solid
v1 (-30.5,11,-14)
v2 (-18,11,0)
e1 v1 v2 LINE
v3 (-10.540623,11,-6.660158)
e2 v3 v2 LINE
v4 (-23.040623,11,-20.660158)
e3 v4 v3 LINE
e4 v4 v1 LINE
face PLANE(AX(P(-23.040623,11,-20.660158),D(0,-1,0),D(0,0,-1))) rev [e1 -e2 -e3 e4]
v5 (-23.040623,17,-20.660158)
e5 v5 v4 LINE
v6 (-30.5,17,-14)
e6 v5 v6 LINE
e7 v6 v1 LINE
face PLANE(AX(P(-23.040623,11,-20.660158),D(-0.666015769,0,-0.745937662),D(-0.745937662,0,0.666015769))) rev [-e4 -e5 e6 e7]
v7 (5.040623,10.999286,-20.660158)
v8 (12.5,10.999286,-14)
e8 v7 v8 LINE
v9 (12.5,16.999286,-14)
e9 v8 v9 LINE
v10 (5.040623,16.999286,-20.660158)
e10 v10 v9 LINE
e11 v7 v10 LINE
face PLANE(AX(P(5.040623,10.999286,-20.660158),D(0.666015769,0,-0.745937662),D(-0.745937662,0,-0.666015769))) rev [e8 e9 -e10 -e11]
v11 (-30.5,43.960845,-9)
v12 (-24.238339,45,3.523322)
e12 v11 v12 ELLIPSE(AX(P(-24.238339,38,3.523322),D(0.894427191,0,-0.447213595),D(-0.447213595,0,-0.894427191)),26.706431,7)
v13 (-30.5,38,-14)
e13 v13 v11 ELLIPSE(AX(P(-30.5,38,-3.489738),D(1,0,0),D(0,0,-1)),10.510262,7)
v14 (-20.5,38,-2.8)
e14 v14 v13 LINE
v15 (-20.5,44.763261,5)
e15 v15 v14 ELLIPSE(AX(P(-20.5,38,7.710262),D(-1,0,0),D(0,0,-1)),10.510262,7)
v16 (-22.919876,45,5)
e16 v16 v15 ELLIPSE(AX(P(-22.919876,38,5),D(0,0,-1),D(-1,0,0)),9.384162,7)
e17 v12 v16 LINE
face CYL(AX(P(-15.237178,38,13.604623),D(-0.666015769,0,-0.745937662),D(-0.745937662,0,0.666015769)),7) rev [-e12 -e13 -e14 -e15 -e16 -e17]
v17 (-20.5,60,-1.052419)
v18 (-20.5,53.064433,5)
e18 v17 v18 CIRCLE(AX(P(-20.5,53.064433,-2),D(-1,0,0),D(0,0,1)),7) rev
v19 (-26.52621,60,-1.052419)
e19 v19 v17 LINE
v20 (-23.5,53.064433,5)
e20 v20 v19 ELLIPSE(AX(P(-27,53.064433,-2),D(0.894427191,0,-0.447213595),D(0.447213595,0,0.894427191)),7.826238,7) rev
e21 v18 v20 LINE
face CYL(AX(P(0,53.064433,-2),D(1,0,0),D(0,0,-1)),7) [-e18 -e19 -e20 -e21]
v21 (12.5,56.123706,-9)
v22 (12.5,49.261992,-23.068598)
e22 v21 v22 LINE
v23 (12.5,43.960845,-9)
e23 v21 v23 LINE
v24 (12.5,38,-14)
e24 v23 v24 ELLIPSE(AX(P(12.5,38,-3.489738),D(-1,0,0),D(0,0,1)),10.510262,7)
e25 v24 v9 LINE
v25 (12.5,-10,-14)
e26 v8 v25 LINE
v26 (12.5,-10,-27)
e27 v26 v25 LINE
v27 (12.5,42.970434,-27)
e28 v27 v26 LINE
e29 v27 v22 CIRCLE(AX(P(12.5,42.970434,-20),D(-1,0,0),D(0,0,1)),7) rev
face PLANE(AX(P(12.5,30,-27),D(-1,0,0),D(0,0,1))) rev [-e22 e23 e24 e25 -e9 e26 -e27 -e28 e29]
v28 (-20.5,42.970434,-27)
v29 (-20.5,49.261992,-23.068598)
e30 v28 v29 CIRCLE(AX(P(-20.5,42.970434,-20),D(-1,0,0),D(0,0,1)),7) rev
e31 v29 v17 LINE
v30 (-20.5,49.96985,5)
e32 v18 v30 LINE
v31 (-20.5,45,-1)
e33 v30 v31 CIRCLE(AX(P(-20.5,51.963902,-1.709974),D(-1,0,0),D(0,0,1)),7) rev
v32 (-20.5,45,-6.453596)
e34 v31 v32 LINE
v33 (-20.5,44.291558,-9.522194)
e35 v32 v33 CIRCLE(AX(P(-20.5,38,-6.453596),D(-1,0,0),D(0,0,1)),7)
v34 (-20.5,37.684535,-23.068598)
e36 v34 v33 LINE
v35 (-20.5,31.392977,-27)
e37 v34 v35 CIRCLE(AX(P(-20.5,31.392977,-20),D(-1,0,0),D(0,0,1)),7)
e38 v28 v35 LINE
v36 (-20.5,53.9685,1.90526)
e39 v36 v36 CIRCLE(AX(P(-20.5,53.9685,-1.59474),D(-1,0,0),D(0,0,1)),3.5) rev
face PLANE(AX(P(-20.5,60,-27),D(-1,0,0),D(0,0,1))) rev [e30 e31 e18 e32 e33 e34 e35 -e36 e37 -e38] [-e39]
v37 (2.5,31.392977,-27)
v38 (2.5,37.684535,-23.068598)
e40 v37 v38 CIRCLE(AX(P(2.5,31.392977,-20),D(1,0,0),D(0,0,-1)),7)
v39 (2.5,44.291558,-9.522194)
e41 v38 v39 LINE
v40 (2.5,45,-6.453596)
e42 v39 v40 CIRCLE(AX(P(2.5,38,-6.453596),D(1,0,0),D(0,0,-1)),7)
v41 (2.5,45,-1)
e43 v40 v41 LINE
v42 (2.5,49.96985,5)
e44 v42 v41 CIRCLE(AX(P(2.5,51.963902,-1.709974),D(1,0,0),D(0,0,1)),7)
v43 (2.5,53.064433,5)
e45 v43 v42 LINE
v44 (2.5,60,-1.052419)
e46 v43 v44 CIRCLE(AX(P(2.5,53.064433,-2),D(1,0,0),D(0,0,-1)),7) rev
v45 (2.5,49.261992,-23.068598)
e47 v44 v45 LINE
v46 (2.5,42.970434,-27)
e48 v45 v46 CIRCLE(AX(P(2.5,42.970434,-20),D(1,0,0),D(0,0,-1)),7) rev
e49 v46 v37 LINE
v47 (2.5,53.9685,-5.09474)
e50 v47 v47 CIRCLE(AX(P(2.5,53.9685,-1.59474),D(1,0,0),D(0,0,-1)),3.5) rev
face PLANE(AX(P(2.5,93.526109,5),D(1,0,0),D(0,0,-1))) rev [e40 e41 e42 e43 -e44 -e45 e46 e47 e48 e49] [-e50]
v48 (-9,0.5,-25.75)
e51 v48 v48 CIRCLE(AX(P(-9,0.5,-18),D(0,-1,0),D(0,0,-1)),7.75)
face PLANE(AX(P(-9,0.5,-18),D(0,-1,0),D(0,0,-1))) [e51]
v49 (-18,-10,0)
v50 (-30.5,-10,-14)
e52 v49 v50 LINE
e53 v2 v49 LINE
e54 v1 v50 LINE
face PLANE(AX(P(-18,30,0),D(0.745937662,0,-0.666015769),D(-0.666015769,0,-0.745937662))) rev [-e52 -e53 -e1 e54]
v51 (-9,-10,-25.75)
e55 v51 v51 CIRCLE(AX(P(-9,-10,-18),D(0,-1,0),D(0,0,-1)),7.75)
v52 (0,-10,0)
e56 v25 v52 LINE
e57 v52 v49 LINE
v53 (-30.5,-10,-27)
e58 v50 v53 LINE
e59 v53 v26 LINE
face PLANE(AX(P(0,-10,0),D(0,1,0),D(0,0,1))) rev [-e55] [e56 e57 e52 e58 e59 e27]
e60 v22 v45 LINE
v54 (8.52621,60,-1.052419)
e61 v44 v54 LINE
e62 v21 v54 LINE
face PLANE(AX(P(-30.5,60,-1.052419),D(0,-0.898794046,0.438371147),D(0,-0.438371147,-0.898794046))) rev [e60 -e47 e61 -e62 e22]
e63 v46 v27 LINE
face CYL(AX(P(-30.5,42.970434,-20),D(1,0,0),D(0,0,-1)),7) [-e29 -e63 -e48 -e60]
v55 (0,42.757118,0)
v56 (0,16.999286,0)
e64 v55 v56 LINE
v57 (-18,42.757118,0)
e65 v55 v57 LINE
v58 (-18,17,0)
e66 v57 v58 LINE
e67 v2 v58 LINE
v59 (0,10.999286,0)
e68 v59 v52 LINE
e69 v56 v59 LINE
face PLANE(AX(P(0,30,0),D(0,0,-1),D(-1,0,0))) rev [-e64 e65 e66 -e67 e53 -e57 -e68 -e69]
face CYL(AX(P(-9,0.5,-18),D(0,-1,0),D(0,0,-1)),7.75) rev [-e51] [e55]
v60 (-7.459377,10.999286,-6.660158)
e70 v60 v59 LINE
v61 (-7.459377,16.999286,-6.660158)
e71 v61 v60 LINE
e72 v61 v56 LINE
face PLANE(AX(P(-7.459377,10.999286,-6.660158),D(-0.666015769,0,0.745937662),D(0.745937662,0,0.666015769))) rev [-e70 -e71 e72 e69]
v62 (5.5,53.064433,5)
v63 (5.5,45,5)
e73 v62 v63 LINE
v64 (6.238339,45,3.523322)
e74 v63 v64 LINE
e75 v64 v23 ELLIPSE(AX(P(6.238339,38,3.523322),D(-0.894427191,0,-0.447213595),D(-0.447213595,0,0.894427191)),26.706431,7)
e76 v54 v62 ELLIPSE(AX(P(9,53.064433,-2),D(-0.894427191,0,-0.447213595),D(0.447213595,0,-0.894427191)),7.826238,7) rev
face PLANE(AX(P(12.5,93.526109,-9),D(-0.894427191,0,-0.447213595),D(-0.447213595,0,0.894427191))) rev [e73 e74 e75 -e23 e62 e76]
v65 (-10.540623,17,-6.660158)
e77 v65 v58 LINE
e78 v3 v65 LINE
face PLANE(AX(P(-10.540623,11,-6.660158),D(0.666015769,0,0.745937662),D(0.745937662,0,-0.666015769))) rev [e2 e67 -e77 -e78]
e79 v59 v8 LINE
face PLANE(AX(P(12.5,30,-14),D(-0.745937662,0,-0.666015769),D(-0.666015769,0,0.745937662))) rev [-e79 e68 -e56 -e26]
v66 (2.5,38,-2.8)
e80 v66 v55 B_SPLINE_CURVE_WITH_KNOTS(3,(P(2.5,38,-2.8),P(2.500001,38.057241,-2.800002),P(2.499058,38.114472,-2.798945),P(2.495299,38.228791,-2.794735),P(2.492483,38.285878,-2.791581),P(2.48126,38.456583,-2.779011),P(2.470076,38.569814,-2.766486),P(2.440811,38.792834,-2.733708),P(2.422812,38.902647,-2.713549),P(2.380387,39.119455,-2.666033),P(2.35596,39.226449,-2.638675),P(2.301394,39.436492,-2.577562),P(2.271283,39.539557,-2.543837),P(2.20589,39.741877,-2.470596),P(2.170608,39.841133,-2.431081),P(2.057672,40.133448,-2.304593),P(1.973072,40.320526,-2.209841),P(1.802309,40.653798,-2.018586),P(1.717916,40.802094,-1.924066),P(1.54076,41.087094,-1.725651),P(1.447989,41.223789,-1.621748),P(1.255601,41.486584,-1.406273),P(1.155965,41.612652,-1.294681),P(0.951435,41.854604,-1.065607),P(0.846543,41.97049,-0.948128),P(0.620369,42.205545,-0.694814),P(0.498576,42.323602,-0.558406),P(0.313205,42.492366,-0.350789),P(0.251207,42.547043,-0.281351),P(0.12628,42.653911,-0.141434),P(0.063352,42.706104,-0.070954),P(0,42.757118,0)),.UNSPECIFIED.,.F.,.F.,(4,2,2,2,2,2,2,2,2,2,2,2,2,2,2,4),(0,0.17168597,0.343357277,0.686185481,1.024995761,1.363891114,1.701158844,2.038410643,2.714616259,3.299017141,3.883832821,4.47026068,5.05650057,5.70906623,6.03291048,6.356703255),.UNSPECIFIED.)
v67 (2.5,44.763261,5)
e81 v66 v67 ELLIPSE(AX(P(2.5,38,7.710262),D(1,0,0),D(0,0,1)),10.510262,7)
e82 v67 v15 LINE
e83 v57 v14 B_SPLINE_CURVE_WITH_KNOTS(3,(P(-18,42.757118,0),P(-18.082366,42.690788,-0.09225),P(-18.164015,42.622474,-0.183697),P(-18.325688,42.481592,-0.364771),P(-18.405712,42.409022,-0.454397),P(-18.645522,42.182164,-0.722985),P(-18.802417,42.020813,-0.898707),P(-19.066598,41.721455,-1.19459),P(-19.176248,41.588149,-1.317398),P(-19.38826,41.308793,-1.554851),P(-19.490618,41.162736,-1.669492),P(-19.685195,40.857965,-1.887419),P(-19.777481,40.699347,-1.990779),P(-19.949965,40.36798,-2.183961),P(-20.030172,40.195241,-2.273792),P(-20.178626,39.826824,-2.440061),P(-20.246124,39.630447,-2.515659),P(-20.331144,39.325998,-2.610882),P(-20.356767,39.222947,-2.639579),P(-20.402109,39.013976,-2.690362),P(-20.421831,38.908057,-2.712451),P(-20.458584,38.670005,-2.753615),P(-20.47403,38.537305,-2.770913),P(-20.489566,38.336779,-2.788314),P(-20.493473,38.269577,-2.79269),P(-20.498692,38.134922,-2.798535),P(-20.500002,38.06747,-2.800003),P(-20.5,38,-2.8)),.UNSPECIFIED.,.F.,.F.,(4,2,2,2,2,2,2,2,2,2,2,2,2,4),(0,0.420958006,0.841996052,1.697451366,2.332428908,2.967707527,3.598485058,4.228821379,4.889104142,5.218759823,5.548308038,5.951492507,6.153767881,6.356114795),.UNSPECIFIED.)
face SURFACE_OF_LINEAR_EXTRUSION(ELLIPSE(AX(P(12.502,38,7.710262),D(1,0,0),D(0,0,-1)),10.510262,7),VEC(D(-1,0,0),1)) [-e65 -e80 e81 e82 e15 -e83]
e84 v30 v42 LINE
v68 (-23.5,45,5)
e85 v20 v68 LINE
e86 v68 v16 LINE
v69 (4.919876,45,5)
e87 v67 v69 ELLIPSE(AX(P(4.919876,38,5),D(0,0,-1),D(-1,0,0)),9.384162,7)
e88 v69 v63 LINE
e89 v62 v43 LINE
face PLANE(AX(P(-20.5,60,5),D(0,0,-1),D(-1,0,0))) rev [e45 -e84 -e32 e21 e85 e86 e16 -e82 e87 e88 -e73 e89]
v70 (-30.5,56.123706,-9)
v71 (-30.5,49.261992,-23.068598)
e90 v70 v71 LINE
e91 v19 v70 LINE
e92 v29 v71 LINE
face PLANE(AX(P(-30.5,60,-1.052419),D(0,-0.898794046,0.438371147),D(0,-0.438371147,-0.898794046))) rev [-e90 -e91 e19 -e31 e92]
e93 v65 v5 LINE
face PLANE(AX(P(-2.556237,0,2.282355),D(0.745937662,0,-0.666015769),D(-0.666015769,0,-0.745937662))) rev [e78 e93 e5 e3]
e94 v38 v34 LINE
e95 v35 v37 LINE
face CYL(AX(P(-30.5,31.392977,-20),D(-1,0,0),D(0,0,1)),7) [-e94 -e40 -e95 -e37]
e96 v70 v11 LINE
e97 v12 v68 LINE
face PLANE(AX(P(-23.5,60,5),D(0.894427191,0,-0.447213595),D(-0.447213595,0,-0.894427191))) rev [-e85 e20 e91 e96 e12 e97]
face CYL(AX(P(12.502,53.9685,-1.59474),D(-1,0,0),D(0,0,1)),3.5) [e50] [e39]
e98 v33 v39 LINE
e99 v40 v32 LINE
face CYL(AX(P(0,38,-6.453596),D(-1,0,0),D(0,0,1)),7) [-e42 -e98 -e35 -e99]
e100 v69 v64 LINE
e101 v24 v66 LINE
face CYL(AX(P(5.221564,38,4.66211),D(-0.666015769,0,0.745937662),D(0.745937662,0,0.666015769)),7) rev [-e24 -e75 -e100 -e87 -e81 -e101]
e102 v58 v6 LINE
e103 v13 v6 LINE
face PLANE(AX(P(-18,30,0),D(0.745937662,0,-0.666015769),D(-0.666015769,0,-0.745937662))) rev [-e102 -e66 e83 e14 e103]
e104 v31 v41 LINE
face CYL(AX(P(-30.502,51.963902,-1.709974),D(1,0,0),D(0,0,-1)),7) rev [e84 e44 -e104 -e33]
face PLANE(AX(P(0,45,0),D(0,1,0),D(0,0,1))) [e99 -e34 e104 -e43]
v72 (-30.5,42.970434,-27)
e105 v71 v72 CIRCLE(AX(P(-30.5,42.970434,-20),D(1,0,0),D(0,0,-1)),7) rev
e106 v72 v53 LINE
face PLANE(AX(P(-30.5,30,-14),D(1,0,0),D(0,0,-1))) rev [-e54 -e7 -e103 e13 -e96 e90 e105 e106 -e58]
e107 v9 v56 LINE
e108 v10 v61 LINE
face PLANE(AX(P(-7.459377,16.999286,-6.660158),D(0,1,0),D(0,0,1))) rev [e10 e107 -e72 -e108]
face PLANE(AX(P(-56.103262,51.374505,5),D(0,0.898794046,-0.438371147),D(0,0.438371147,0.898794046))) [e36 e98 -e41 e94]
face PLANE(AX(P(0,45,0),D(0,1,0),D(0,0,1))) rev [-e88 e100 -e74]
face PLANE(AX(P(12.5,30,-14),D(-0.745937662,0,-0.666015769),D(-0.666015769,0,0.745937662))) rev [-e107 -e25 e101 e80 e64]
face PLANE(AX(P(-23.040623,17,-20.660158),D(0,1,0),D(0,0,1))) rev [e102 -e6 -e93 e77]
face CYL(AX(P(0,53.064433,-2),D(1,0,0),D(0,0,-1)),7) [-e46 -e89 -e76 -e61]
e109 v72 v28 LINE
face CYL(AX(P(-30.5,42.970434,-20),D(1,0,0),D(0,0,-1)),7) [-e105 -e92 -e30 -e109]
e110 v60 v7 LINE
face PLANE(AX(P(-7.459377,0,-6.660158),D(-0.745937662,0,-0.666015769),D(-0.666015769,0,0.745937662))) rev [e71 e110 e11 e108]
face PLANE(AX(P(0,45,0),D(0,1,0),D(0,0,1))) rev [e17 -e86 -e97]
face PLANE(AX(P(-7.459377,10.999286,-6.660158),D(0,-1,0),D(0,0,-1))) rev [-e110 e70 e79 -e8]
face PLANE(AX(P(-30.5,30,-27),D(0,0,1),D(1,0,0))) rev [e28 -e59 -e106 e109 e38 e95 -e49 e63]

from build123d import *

# Parameters (mm, degrees)
BOSS_EXTRUDE1_DEPTH     = 30
SKETCH6_R               = 7.75
CUT_EXTRUDE3_DEPTH      = 0.5
BOSS_EXTRUDE2_DEPTH     = 15
BOSS_EXTRUDE3_DEPTH     = 15
CHAMFER1_SIZE           = 5
CHAMFER1_SIZE2          = 10.251519208
BOSS_EXTRUDE5_DEPTH     = 15
BOSS_EXTRUDE6_REACH     = 75.607
SKETCH10_R              = 3.5
BOSS_EXTRUDE7_REACH     = 62.698
SKETCH18_W              = 10
SKETCH18_H              = 10.251519208
CUT_EXTRUDE4_DEPTH      = 74.607064878
CUT_EXTRUDE4_DEPTH_BACK = 74.607064878
FILLET4_R               = 7
FILLET5_R               = 7
FILLET6_R               = 7
FILLET7_R               = 7
BOSS_EXTRUDE8_REACH     = 75.607
FILLET9_R               = 7
CUT_EXTRUDE5_DEPTH      = 23
FILLET12_R              = 7
BOSS_EXTRUDE9_REACH     = 75.607
BOSS_EXTRUDE10_START    = 10
SKETCH24_R              = 7.75
BOSS_EXTRUDE10_DEPTH    = 10
SKETCH25_W              = 18.768324379
SKETCH25_H              = 6
CUT_EXTRUDE6_DEPTH      = 10
SKETCH26_W              = 18.768324379
SKETCH26_H              = 6
CUT_EXTRUDE7_DEPTH      = 10


with BuildPart() as part:
    # Sketch1 → Boss-Extrude1 (new body)
    with BuildSketch(Plane(origin=(0, 0, 0), x_dir=(1, 0, 0), z_dir=(0, 1, 0))):
        Polygon((-30.5, 27), (12.5, 27), (12.5, 14), (0, 0), (-18, 0), (-30.5, 14), align=None)
    extrude(amount=BOSS_EXTRUDE1_DEPTH)

    # Sketch6 → Cut-Extrude3 (cut)
    with BuildSketch(Plane.XZ):
        with Locations(Location((-9, -18, 0), (0, 0, 270))):
            Circle(SKETCH6_R)
    extrude(amount=-CUT_EXTRUDE3_DEPTH, mode=Mode.SUBTRACT)

    # Sketch7 → Boss-Extrude2 (add)
    with BuildSketch(Plane(origin=(0, 30, 0), x_dir=(1, 0, 0), z_dir=(0, 1, 0))):
        Polygon((-30.5, 27), (-30.5, 14), (-18, 0), (0, 0), (12.5, 14), (12.5, 27), align=None)
    extrude(amount=BOSS_EXTRUDE2_DEPTH)

    # Sketch8 → Boss-Extrude3 (add)
    with BuildSketch(Plane(origin=(0, 45, 0), x_dir=(1, 0, 0), z_dir=(0, 1, 0))):
        Polygon((-30.5, 27), (-30.5, 9), (-23.5, -5), (-20.5, -5), (-20.5, 27), align=None)
    extrude(amount=BOSS_EXTRUDE3_DEPTH)

    # Chamfer1
    chamfer1_edges = [part.edges().sort_by_distance(p)[0] for p in [
        (-4, 45, -27),
    ]]
    chamfer1_side = [part.faces().sort_by_distance(p)[0] for p in [
        (-10.18705036, 24.658273381, -27),
    ]]
    chamfer(chamfer1_edges, length=CHAMFER1_SIZE, length2=CHAMFER1_SIZE2, reference=chamfer1_side[0])

    # Sketch12 → Boss-Extrude5 (add)
    with BuildSketch(Plane(origin=(0, 45, 0), x_dir=(1, 0, 0), z_dir=(0, 1, 0))):
        Polygon((12.5, 9), (12.5, 27), (2.5, 27), (2.5, -5), (5.5, -5), align=None)
    extrude(amount=BOSS_EXTRUDE5_DEPTH)

    # Sketch10 → Boss-Extrude6 (add, up to next)
    with BuildSketch(Plane(origin=(-20.5, 0, 0), x_dir=(0, 0, -1), z_dir=(1, 0, 0)), mode=Mode.PRIVATE) as boss_extrude6_sk1:
        with Locations(Location((1.594739548, 53.968499846, 0), (0, 0, 180))):
            Circle(SKETCH10_R)
    boss_extrude6_tool1 = extrude(boss_extrude6_sk1.sketch, amount=BOSS_EXTRUDE6_REACH, mode=Mode.PRIVATE) - part.part
    add(boss_extrude6_tool1.solids().sort_by_distance((-20.5, 53.9685, -1.59474))[0])

    # Boss-Extrude7: up to this face of the body (flat: up to its plane)
    boss_extrude7_end = Plane(part.part.faces().sort_by_distance((-4, 42.5, -21.874240396))[0])
    # Sketch18 → Boss-Extrude7 (add, up to the picked face)
    with BuildSketch(Plane.XZ.offset(-45), mode=Mode.PRIVATE) as boss_extrude7_sk1:
        with Locations((7.5, -21.874240396)):
            Rectangle(SKETCH18_W, SKETCH18_H)
    boss_extrude7_tool1 = split(extrude(boss_extrude7_sk1.sketch, amount=BOSS_EXTRUDE7_REACH, mode=Mode.PRIVATE), bisect_by=boss_extrude7_end, keep=Keep.BOTH, mode=Mode.PRIVATE)
    add(boss_extrude7_tool1.solids().sort_by(Axis((7.5, 45, -21.87424), (0, -1, 0)))[0])

    # Sketch19 → Cut-Extrude4 (cut, two sides: drawn at the far end of the back side and taken through both)
    with BuildSketch(Plane(origin=(-20.5, 0, 0), x_dir=(0, 0, -1), z_dir=(1, 0, 0)).offset(-CUT_EXTRUDE4_DEPTH_BACK)):
        Polygon((1.052419117, 60), (27, 47.344519209), (30.679345013, 60.875953777), (1.052419117, 61.751907555), align=None)
    extrude(amount=CUT_EXTRUDE4_DEPTH + CUT_EXTRUDE4_DEPTH_BACK, mode=Mode.SUBTRACT)

    # Fillet4
    # the kernel refuses this fillet: 7 mm, written as the material it takes off along each edge
    with BuildSketch(Plane(origin=(-40.838917655, 60, 5), x_dir=(0, 0, -1), z_dir=(1, 0, 0))) as fillet4_piece_1:
        with BuildLine():
            CenterArc((7, -6.935567062), FILLET4_R, 97.779940417, 82.220059583)
            Line((0, -6.935567062), (-0.14, -6.935567062))
            Line((-0.14, -6.935567062), (-0.14, 0))
            Line((-0.14, 0), (0, 0.14))
            ThreePointArc((0, 0.14), (3.026209558, 0.14), (6.033467499, 0.138711341))
            Line((6.033467499, 0.138711341), (6.052419117, 0))
        make_face()
    extrude(amount=37.677835309, mode=Mode.SUBTRACT)

    # Fillet5
    # the kernel refuses this fillet: 7 mm, written as the material it takes off along each edge
    with BuildSketch(Plane(origin=(-14.838917655, 60, 5), x_dir=(0, 0, -1), z_dir=(1, 0, 0))) as fillet5_piece_1:
        with BuildLine():
            CenterArc((7, -6.935567062), FILLET5_R, 97.779940417, 82.220059583)
            Line((0, -6.935567062), (-0.14, -6.935567062))
            Line((-0.14, -6.935567062), (-0.14, 0))
            Line((-0.14, 0), (0, 0.14))
            ThreePointArc((0, 0.14), (3.026209558, 0.14), (6.033467499, 0.138711341))
            Line((6.033467499, 0.138711341), (6.052419117, 0))
        make_face()
    extrude(amount=37.677835309, mode=Mode.SUBTRACT)

    # Fillet6
    # the kernel refuses this fillet: 7 mm, written as the material it adds along each edge
    with BuildSketch(Plane(origin=(-9.155275963, 45, 10.253909078), x_dir=(0, -1, 0), z_dir=(0.6660157693088524, 0, -0.7459376616259147))) as fillet6_piece_1_section:
        with BuildLine():
            CenterArc((FILLET6_R, -FILLET6_R), FILLET6_R, 90, 90)
            Line((0, -FILLET6_R), (0, 0))
            Line((0, 0), (FILLET6_R, 0))
        make_face()
    fillet6_piece_1 = extrude(amount=50.014659503, mode=Mode.PRIVATE)
    fillet6_piece_1 = split(fillet6_piece_1, bisect_by=Plane(origin=(12.5, 45, 10.253909078), z_dir=(-1, 0, 0)), keep=Keep.TOP, mode=Mode.PRIVATE)
    fillet6_piece_1 = split(fillet6_piece_1, bisect_by=Plane(origin=(2.5, 45, 10.253909078), z_dir=(1, 0, 0)), keep=Keep.TOP, mode=Mode.PRIVATE)
    fillet6_piece_1 = split(fillet6_piece_1, bisect_by=Plane(origin=(0.467381176, 45, 15.065237648), z_dir=(-0.8944271909999162, 0, -0.4472135954999575)), keep=Keep.TOP, mode=Mode.PRIVATE)
    fillet6_piece_1 = split(fillet6_piece_1, bisect_by=Plane(origin=(-9.155275963, 45, 5), z_dir=(0, 0, -1)), keep=Keep.TOP, mode=Mode.PRIVATE)
    add(fillet6_piece_1)

    # Fillet7
    # the kernel refuses this fillet: 7 mm, written as the material it adds along each edge
    with BuildSketch(Plane(origin=(-42.155275963, 45, -27.053909078), x_dir=(-0.7459376616259148, 0, 0.6660157693088522), z_dir=(0.6660157693088522, 0, 0.7459376616259148))) as fillet7_piece_1_section:
        with BuildLine():
            CenterArc((FILLET7_R, FILLET7_R), FILLET7_R, 180, 90)
            Line((0, FILLET7_R), (0, 0))
            Line((0, 0), (FILLET7_R, 0))
        make_face()
    fillet7_piece_1 = extrude(amount=50.014659503, mode=Mode.PRIVATE)
    fillet7_piece_1 = split(fillet7_piece_1, bisect_by=Plane(origin=(-30.5, 45, -27.053909078), z_dir=(1, 0, 0)), keep=Keep.TOP, mode=Mode.PRIVATE)
    fillet7_piece_1 = split(fillet7_piece_1, bisect_by=Plane(origin=(-42.155275963, 45, 5), z_dir=(0, 0, -1)), keep=Keep.TOP, mode=Mode.PRIVATE)
    fillet7_piece_1 = split(fillet7_piece_1, bisect_by=Plane(origin=(-40.052618824, 45, -28.105237648), z_dir=(0.8944271909999161, 0, -0.4472135954999577)), keep=Keep.TOP, mode=Mode.PRIVATE)
    fillet7_piece_1 = split(fillet7_piece_1, bisect_by=Plane(origin=(-20.5, 45, -27.053909078), z_dir=(-1, 0, 0)), keep=Keep.TOP, mode=Mode.PRIVATE)
    add(fillet7_piece_1)

    # Sketch21 → Boss-Extrude8 (add, up to next)
    with BuildSketch(Plane(origin=(-20.5, 0, 0), x_dir=(0, 0, -1), z_dir=(1, 0, 0)), mode=Mode.PRIVATE) as boss_extrude8_sk1:
        with BuildLine():
            Line((2.8, 45), (-5, 45))
            Line((-5, 45), (-5, 44.763260828))
            add(Edge.make_bspline(
                [(2.8, 38), (2.8, 43.376764541), (-5, 44.763260828)],
                knots=[0, 0, 0, 1.309981256, 1.309981256, 1.309981256], degree=2, weights=[1, 0.793053637, 1]))
            Line((2.8, 38), (2.8, 45))
        make_face()
    boss_extrude8_tool1 = extrude(boss_extrude8_sk1.sketch, amount=BOSS_EXTRUDE8_REACH, mode=Mode.PRIVATE) - part.part
    add(boss_extrude8_tool1.solids().sort_by_distance((-20.5, 43.416068, -0.535904))[0])

    # Fillet9
    fillet9_edges = [part.edges().sort_by_distance(p)[0] for p in [
        (-25.5, 47.344519209, -27),
        (7.5, 47.344519209, -27),
        (-9, 40, -27),
    ]]
    fillet(fillet9_edges, radius=FILLET9_R)

    # Sketch22 → Cut-Extrude5 (cut)
    with BuildSketch(Plane.ZY.offset(-2.5)):
        Polygon((5, 51.374505428), (-27, 35.767062594), (-27, 42.970433745), (-2.018410751, 49.666818357), align=None)
    extrude(amount=CUT_EXTRUDE5_DEPTH, mode=Mode.SUBTRACT)

    # Fillet12
    # the kernel refuses this fillet: 7 mm, written as the material it takes off along each edge
    with BuildSketch(Plane(origin=(2.5, 35.767763648, -26.998562626), x_dir=(0, -0.9999999460246048, -0.0003285586515390651), z_dir=(-1, 0, 0))) as fillet12_piece_1:
        with BuildLine():
            CenterArc((4.372486843, 6.999999622), FILLET12_R, 206.018825024, 64)
            Line((-1.918062927, 3.929334614), (-2.547117904, 3.622268114))
            Line((-2.547117904, 3.622268114), (-0.629054977, -0.307066501))
            Line((-0.629054977, -0.307066501), (-0.013954967, -0.699860885))
            ThreePointArc((-0.013954967, -0.699860885), (0.142079567, -0.70139073), (4.375016745, -0.699999962))
            Line((4.375016745, -0.699999962), (4.374786754, 0))
        make_face()
    extrude(amount=23, mode=Mode.SUBTRACT)
    with BuildSketch(Plane(origin=(2.5, 45, -8.069672968), x_dir=(0, -0.438371146789077, -0.8987940462991671), z_dir=(-1, 0, 0))) as fillet12_piece_2:
        with BuildLine():
            CenterArc((FILLET12_R * 0.230868191126, FILLET12_R), FILLET12_R, 244, 26)
            Line((-FILLET12_R * 0.207502955664, FILLET12_R * 0.101205953701), (0, 0))
            Line((0, 0), (FILLET12_R * 0.230868191126, 0))
        make_face()
    extrude(amount=23, mode=Mode.SUBTRACT)

    # Sketch23 → Boss-Extrude9 (add, up to next)
    with BuildSketch(Plane.ZY.offset(-2.5), mode=Mode.PRIVATE) as boss_extrude9_sk1:
        with BuildLine():
            Line((5, 45), (-1, 45))
            ThreePointArc((-1, 45), (2.755309717, 46.57305469), (5, 49.969849895))
            Line((5, 49.969849895), (5, 45))
        make_face()
    boss_extrude9_tool1 = extrude(boss_extrude9_sk1.sketch, amount=BOSS_EXTRUDE9_REACH, mode=Mode.PRIVATE) - part.part
    add(boss_extrude9_tool1.solids().sort_by_distance((2.5, 46.322933, 3.503714))[0])

    # Sketch24 → Boss-Extrude10 (add)
    with BuildSketch(Plane.XZ.offset(BOSS_EXTRUDE10_START)):
        Polygon((-30.5, -14), (-30.5, -27), (12.5, -27), (12.5, -14), (0, 0), (-18, 0), align=None)
        with Locations(Location((-9, -18, 0), (0, 0, 270))):
            Circle(SKETCH24_R, mode=Mode.SUBTRACT)
    extrude(amount=-BOSS_EXTRUDE10_DEPTH)

    # Sketch25 → Cut-Extrude6 (cut)
    with BuildSketch(Plane(origin=(0, 0, 0), x_dir=(0.6660157693088523, 0, -0.7459376616259148), z_dir=(0.7459376616259148, 0, 0.6660157693088523))):
        with Locations((9.38416219, 13.99928604)):
            Rectangle(SKETCH25_W, SKETCH25_H)
    extrude(amount=-CUT_EXTRUDE6_DEPTH, mode=Mode.SUBTRACT)

    # Sketch26 → Cut-Extrude7 (cut)
    with BuildSketch(Plane(origin=(-10.015613911, 0, 8.94251242), x_dir=(0.6660157693088522, 0, 0.7459376616259148), z_dir=(-0.7459376616259148, 0, 0.6660157693088522))):
        with Locations((-21.372446038, 14)):
            Rectangle(SKETCH26_W, SKETCH26_H)
    extrude(amount=-CUT_EXTRUDE7_DEPTH, mode=Mode.SUBTRACT)


solid = part.part
